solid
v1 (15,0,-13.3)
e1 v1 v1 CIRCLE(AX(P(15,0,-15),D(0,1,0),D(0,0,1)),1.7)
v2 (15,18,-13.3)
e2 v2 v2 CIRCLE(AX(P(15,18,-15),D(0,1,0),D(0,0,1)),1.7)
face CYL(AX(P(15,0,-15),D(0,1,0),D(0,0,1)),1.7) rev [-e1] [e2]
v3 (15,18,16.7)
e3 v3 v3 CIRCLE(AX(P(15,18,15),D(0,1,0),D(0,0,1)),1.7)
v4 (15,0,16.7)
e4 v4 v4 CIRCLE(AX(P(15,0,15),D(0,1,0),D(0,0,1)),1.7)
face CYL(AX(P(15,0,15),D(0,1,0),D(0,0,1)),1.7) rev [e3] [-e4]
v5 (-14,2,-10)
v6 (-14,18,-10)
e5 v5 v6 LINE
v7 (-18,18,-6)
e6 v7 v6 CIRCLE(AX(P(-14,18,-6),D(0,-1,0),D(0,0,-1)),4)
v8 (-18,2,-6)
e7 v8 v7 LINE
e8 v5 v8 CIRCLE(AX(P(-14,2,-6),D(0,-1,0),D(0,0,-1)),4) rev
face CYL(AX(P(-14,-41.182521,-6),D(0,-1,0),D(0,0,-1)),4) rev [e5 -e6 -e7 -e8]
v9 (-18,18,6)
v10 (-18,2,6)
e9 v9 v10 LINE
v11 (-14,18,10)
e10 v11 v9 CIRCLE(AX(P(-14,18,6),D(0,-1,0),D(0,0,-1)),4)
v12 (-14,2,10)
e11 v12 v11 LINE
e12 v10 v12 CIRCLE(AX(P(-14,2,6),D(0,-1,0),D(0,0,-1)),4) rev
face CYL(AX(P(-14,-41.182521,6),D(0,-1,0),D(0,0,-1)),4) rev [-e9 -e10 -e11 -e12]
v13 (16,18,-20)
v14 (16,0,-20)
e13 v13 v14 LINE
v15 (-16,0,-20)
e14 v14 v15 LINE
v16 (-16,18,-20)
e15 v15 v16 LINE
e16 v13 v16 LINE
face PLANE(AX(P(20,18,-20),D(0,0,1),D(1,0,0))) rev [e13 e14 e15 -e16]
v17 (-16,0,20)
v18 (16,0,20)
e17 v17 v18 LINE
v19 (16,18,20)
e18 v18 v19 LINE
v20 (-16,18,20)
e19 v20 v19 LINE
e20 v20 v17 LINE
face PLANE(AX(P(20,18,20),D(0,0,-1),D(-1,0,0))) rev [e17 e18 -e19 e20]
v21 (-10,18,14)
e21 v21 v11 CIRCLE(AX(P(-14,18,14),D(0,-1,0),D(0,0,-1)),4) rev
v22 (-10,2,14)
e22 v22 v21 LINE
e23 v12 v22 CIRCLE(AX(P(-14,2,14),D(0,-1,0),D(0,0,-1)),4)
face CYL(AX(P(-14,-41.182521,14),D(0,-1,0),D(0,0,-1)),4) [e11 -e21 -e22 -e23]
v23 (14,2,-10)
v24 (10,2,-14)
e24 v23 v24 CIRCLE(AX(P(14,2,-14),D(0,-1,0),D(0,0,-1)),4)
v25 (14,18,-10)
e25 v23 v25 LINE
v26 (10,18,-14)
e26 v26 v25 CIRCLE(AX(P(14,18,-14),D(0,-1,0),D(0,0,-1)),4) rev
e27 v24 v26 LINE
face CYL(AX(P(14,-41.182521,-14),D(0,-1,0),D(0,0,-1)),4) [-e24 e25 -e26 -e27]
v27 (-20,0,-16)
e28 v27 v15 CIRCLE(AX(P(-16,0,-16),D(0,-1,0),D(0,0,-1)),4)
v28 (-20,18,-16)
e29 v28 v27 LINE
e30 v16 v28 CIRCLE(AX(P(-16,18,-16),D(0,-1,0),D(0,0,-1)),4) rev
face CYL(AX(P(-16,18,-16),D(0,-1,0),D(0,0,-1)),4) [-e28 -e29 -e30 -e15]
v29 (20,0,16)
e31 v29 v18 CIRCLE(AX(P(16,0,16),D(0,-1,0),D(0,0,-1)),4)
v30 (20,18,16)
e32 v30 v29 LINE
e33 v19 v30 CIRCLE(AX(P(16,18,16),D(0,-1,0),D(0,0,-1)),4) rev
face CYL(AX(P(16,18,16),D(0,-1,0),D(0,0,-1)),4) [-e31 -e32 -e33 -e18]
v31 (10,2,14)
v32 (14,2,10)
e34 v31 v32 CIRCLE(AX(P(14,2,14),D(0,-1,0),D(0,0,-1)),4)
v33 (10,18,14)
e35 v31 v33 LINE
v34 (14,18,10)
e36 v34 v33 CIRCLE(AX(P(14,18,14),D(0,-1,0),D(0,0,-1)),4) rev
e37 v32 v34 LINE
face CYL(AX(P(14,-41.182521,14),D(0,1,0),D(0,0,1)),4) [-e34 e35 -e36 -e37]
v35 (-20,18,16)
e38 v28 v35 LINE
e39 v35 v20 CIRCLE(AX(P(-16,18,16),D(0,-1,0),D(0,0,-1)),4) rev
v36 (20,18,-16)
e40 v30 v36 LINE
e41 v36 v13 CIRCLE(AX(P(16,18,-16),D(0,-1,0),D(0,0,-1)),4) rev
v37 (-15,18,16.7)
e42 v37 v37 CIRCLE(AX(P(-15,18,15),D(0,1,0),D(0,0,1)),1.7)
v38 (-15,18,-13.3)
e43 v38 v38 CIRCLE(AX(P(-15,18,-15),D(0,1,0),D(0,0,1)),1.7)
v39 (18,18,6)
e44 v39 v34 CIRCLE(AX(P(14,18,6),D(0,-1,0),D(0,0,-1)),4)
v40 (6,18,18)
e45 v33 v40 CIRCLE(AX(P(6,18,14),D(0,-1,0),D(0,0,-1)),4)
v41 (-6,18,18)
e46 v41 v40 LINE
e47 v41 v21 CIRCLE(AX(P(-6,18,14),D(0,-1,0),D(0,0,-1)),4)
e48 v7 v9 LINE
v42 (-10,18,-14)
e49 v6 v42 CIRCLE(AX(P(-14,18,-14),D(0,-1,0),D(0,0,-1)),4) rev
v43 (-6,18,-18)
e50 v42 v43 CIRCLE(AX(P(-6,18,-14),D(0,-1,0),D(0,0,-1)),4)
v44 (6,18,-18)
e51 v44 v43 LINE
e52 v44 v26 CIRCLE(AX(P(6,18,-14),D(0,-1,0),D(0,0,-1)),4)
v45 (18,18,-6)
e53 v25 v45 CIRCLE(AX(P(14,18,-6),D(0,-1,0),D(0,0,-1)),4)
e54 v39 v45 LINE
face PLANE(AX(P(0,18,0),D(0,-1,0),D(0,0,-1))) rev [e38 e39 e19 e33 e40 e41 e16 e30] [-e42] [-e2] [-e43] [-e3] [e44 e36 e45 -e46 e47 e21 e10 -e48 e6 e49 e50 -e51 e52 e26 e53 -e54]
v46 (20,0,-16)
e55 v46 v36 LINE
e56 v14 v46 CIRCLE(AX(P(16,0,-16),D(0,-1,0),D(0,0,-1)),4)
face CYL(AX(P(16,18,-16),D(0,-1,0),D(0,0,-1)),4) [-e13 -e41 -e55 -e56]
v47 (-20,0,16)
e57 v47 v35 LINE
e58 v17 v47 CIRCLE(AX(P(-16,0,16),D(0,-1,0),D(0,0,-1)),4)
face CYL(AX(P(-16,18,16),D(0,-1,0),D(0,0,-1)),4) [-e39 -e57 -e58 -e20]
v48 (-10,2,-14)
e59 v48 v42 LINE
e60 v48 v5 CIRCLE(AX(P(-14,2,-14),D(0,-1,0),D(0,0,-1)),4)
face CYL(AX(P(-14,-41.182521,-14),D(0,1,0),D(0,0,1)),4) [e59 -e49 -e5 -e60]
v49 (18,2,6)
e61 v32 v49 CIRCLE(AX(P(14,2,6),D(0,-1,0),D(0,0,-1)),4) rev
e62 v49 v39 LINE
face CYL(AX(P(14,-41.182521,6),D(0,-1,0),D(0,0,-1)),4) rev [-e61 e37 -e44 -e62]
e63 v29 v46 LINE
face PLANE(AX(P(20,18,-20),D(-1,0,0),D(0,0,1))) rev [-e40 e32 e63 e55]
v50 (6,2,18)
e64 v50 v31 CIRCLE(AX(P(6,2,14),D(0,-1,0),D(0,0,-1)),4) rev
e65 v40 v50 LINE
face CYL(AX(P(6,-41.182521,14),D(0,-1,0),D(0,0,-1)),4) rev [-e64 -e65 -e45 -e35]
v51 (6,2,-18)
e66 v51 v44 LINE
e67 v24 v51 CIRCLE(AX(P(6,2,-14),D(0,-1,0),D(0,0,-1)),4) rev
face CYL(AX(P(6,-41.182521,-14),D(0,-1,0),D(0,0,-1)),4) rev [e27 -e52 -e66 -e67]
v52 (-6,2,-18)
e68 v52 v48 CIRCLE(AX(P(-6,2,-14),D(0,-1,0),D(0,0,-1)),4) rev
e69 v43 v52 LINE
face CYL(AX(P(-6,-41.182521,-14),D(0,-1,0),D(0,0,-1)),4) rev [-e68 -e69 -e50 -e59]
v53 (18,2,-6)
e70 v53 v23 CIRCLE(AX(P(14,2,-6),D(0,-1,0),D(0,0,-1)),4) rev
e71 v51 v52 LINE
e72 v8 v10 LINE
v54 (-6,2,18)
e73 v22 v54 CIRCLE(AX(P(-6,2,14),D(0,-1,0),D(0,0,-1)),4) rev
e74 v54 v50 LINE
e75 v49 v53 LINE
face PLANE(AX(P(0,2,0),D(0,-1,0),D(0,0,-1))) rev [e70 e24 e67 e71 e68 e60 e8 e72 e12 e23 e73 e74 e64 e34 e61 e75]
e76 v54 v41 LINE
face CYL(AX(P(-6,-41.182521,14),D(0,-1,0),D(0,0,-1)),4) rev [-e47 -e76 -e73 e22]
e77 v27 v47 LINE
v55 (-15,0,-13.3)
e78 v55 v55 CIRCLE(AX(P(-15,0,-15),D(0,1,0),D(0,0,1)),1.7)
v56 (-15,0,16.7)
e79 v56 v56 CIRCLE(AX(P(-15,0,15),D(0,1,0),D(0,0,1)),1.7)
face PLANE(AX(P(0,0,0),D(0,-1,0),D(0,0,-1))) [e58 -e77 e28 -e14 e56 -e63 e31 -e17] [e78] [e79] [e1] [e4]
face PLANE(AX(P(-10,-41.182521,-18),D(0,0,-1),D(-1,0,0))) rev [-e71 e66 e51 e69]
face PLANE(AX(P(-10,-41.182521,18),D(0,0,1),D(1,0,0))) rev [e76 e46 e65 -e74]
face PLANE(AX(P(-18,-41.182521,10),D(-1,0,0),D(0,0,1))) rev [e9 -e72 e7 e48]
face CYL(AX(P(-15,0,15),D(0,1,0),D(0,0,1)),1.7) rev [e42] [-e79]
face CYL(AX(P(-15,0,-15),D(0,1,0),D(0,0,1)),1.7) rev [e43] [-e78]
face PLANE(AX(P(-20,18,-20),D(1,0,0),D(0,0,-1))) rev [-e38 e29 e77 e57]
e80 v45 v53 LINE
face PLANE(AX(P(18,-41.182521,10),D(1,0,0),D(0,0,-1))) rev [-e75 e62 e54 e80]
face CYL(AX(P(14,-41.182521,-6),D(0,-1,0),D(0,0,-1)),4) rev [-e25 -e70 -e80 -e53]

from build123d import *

# Parameters (mm, degrees)
SKETCH1_W           = 40
SKETCH1_H           = 40
BOSS_EXTRUDE1_DEPTH = 18
SKETCH2_R           = 1.7
CUT_EXTRUDE1_DEPTH  = 34.526109228
SKETCH3_W           = 36
SKETCH3_H           = 20
CUT_EXTRUDE2_DEPTH  = 16
CIRPATTERN1_COUNT   = 2
CIRPATTERN1_ANGLE   = 90
FILLET1_R           = 4


with BuildPart() as part:
    # Sketch1 → Boss-Extrude1 (new body)
    with BuildSketch(Plane(origin=(0, 0, 0), x_dir=(1, 0, 0), z_dir=(0, 1, 0))):
        Rectangle(SKETCH1_W, SKETCH1_H)
    extrude(amount=BOSS_EXTRUDE1_DEPTH)

    # Sketch2 → Cut-Extrude1 (cut, through all)
    with BuildSketch(Plane(origin=(0, 18, 0), x_dir=(1, 0, 0), z_dir=(0, 1, 0))):
        with Locations(Location((15, 15, 0), (0, 0, 270))):
            Circle(SKETCH2_R)
        with Locations(Location((15, -15, 0), (0, 0, 270))):
            Circle(SKETCH2_R)
        with Locations(Location((-15, -15, 0), (0, 0, 270))):
            Circle(SKETCH2_R)
        with Locations(Location((-15, 15, 0), (0, 0, 270))):
            Circle(SKETCH2_R)
    extrude(amount=-CUT_EXTRUDE1_DEPTH, mode=Mode.SUBTRACT)

    # Sketch3 → Cut-Extrude2 (cut)
    with BuildSketch(Plane(origin=(0, 18, 0), x_dir=(1, 0, 0), z_dir=(0, 1, 0))):
        Rectangle(SKETCH3_W, SKETCH3_H)
    cut_extrude2 = extrude(amount=-CUT_EXTRUDE2_DEPTH, mode=Mode.SUBTRACT)

    # CirPattern1: Cut-Extrude2 ×2 about axis
    cirpattern1_axis = Axis((0, 0, 0), (0, -1, 0))
    for i in range(1, CIRPATTERN1_COUNT):
        add(cut_extrude2.rotate(cirpattern1_axis, i * CIRPATTERN1_ANGLE / (CIRPATTERN1_COUNT - 1)), mode=Mode.SUBTRACT)

    # Fillet1
    fillet1_edges = [part.edges().sort_by_distance(p)[0] for p in [
        (20, 9, -20),
        (-20, 9, -20),
        (-20, 9, 20),
        (20, 9, 20),
        (-10, 10, 18),
        (-10, 10, 10),
        (-18, 10, 10),
        (-18, 10, -10),
        (-10, 10, -10),
        (-10, 10, -18),
        (10, 10, -18),
        (10, 10, -10),
        (18, 10, -10),
        (18, 10, 10),
        (10, 10, 18),
        (10, 10, 10),
    ]]
    fillet(fillet1_edges, radius=FILLET1_R - 0.0001)  # a hair under: the kernel refuses the full size


solid = part.part
